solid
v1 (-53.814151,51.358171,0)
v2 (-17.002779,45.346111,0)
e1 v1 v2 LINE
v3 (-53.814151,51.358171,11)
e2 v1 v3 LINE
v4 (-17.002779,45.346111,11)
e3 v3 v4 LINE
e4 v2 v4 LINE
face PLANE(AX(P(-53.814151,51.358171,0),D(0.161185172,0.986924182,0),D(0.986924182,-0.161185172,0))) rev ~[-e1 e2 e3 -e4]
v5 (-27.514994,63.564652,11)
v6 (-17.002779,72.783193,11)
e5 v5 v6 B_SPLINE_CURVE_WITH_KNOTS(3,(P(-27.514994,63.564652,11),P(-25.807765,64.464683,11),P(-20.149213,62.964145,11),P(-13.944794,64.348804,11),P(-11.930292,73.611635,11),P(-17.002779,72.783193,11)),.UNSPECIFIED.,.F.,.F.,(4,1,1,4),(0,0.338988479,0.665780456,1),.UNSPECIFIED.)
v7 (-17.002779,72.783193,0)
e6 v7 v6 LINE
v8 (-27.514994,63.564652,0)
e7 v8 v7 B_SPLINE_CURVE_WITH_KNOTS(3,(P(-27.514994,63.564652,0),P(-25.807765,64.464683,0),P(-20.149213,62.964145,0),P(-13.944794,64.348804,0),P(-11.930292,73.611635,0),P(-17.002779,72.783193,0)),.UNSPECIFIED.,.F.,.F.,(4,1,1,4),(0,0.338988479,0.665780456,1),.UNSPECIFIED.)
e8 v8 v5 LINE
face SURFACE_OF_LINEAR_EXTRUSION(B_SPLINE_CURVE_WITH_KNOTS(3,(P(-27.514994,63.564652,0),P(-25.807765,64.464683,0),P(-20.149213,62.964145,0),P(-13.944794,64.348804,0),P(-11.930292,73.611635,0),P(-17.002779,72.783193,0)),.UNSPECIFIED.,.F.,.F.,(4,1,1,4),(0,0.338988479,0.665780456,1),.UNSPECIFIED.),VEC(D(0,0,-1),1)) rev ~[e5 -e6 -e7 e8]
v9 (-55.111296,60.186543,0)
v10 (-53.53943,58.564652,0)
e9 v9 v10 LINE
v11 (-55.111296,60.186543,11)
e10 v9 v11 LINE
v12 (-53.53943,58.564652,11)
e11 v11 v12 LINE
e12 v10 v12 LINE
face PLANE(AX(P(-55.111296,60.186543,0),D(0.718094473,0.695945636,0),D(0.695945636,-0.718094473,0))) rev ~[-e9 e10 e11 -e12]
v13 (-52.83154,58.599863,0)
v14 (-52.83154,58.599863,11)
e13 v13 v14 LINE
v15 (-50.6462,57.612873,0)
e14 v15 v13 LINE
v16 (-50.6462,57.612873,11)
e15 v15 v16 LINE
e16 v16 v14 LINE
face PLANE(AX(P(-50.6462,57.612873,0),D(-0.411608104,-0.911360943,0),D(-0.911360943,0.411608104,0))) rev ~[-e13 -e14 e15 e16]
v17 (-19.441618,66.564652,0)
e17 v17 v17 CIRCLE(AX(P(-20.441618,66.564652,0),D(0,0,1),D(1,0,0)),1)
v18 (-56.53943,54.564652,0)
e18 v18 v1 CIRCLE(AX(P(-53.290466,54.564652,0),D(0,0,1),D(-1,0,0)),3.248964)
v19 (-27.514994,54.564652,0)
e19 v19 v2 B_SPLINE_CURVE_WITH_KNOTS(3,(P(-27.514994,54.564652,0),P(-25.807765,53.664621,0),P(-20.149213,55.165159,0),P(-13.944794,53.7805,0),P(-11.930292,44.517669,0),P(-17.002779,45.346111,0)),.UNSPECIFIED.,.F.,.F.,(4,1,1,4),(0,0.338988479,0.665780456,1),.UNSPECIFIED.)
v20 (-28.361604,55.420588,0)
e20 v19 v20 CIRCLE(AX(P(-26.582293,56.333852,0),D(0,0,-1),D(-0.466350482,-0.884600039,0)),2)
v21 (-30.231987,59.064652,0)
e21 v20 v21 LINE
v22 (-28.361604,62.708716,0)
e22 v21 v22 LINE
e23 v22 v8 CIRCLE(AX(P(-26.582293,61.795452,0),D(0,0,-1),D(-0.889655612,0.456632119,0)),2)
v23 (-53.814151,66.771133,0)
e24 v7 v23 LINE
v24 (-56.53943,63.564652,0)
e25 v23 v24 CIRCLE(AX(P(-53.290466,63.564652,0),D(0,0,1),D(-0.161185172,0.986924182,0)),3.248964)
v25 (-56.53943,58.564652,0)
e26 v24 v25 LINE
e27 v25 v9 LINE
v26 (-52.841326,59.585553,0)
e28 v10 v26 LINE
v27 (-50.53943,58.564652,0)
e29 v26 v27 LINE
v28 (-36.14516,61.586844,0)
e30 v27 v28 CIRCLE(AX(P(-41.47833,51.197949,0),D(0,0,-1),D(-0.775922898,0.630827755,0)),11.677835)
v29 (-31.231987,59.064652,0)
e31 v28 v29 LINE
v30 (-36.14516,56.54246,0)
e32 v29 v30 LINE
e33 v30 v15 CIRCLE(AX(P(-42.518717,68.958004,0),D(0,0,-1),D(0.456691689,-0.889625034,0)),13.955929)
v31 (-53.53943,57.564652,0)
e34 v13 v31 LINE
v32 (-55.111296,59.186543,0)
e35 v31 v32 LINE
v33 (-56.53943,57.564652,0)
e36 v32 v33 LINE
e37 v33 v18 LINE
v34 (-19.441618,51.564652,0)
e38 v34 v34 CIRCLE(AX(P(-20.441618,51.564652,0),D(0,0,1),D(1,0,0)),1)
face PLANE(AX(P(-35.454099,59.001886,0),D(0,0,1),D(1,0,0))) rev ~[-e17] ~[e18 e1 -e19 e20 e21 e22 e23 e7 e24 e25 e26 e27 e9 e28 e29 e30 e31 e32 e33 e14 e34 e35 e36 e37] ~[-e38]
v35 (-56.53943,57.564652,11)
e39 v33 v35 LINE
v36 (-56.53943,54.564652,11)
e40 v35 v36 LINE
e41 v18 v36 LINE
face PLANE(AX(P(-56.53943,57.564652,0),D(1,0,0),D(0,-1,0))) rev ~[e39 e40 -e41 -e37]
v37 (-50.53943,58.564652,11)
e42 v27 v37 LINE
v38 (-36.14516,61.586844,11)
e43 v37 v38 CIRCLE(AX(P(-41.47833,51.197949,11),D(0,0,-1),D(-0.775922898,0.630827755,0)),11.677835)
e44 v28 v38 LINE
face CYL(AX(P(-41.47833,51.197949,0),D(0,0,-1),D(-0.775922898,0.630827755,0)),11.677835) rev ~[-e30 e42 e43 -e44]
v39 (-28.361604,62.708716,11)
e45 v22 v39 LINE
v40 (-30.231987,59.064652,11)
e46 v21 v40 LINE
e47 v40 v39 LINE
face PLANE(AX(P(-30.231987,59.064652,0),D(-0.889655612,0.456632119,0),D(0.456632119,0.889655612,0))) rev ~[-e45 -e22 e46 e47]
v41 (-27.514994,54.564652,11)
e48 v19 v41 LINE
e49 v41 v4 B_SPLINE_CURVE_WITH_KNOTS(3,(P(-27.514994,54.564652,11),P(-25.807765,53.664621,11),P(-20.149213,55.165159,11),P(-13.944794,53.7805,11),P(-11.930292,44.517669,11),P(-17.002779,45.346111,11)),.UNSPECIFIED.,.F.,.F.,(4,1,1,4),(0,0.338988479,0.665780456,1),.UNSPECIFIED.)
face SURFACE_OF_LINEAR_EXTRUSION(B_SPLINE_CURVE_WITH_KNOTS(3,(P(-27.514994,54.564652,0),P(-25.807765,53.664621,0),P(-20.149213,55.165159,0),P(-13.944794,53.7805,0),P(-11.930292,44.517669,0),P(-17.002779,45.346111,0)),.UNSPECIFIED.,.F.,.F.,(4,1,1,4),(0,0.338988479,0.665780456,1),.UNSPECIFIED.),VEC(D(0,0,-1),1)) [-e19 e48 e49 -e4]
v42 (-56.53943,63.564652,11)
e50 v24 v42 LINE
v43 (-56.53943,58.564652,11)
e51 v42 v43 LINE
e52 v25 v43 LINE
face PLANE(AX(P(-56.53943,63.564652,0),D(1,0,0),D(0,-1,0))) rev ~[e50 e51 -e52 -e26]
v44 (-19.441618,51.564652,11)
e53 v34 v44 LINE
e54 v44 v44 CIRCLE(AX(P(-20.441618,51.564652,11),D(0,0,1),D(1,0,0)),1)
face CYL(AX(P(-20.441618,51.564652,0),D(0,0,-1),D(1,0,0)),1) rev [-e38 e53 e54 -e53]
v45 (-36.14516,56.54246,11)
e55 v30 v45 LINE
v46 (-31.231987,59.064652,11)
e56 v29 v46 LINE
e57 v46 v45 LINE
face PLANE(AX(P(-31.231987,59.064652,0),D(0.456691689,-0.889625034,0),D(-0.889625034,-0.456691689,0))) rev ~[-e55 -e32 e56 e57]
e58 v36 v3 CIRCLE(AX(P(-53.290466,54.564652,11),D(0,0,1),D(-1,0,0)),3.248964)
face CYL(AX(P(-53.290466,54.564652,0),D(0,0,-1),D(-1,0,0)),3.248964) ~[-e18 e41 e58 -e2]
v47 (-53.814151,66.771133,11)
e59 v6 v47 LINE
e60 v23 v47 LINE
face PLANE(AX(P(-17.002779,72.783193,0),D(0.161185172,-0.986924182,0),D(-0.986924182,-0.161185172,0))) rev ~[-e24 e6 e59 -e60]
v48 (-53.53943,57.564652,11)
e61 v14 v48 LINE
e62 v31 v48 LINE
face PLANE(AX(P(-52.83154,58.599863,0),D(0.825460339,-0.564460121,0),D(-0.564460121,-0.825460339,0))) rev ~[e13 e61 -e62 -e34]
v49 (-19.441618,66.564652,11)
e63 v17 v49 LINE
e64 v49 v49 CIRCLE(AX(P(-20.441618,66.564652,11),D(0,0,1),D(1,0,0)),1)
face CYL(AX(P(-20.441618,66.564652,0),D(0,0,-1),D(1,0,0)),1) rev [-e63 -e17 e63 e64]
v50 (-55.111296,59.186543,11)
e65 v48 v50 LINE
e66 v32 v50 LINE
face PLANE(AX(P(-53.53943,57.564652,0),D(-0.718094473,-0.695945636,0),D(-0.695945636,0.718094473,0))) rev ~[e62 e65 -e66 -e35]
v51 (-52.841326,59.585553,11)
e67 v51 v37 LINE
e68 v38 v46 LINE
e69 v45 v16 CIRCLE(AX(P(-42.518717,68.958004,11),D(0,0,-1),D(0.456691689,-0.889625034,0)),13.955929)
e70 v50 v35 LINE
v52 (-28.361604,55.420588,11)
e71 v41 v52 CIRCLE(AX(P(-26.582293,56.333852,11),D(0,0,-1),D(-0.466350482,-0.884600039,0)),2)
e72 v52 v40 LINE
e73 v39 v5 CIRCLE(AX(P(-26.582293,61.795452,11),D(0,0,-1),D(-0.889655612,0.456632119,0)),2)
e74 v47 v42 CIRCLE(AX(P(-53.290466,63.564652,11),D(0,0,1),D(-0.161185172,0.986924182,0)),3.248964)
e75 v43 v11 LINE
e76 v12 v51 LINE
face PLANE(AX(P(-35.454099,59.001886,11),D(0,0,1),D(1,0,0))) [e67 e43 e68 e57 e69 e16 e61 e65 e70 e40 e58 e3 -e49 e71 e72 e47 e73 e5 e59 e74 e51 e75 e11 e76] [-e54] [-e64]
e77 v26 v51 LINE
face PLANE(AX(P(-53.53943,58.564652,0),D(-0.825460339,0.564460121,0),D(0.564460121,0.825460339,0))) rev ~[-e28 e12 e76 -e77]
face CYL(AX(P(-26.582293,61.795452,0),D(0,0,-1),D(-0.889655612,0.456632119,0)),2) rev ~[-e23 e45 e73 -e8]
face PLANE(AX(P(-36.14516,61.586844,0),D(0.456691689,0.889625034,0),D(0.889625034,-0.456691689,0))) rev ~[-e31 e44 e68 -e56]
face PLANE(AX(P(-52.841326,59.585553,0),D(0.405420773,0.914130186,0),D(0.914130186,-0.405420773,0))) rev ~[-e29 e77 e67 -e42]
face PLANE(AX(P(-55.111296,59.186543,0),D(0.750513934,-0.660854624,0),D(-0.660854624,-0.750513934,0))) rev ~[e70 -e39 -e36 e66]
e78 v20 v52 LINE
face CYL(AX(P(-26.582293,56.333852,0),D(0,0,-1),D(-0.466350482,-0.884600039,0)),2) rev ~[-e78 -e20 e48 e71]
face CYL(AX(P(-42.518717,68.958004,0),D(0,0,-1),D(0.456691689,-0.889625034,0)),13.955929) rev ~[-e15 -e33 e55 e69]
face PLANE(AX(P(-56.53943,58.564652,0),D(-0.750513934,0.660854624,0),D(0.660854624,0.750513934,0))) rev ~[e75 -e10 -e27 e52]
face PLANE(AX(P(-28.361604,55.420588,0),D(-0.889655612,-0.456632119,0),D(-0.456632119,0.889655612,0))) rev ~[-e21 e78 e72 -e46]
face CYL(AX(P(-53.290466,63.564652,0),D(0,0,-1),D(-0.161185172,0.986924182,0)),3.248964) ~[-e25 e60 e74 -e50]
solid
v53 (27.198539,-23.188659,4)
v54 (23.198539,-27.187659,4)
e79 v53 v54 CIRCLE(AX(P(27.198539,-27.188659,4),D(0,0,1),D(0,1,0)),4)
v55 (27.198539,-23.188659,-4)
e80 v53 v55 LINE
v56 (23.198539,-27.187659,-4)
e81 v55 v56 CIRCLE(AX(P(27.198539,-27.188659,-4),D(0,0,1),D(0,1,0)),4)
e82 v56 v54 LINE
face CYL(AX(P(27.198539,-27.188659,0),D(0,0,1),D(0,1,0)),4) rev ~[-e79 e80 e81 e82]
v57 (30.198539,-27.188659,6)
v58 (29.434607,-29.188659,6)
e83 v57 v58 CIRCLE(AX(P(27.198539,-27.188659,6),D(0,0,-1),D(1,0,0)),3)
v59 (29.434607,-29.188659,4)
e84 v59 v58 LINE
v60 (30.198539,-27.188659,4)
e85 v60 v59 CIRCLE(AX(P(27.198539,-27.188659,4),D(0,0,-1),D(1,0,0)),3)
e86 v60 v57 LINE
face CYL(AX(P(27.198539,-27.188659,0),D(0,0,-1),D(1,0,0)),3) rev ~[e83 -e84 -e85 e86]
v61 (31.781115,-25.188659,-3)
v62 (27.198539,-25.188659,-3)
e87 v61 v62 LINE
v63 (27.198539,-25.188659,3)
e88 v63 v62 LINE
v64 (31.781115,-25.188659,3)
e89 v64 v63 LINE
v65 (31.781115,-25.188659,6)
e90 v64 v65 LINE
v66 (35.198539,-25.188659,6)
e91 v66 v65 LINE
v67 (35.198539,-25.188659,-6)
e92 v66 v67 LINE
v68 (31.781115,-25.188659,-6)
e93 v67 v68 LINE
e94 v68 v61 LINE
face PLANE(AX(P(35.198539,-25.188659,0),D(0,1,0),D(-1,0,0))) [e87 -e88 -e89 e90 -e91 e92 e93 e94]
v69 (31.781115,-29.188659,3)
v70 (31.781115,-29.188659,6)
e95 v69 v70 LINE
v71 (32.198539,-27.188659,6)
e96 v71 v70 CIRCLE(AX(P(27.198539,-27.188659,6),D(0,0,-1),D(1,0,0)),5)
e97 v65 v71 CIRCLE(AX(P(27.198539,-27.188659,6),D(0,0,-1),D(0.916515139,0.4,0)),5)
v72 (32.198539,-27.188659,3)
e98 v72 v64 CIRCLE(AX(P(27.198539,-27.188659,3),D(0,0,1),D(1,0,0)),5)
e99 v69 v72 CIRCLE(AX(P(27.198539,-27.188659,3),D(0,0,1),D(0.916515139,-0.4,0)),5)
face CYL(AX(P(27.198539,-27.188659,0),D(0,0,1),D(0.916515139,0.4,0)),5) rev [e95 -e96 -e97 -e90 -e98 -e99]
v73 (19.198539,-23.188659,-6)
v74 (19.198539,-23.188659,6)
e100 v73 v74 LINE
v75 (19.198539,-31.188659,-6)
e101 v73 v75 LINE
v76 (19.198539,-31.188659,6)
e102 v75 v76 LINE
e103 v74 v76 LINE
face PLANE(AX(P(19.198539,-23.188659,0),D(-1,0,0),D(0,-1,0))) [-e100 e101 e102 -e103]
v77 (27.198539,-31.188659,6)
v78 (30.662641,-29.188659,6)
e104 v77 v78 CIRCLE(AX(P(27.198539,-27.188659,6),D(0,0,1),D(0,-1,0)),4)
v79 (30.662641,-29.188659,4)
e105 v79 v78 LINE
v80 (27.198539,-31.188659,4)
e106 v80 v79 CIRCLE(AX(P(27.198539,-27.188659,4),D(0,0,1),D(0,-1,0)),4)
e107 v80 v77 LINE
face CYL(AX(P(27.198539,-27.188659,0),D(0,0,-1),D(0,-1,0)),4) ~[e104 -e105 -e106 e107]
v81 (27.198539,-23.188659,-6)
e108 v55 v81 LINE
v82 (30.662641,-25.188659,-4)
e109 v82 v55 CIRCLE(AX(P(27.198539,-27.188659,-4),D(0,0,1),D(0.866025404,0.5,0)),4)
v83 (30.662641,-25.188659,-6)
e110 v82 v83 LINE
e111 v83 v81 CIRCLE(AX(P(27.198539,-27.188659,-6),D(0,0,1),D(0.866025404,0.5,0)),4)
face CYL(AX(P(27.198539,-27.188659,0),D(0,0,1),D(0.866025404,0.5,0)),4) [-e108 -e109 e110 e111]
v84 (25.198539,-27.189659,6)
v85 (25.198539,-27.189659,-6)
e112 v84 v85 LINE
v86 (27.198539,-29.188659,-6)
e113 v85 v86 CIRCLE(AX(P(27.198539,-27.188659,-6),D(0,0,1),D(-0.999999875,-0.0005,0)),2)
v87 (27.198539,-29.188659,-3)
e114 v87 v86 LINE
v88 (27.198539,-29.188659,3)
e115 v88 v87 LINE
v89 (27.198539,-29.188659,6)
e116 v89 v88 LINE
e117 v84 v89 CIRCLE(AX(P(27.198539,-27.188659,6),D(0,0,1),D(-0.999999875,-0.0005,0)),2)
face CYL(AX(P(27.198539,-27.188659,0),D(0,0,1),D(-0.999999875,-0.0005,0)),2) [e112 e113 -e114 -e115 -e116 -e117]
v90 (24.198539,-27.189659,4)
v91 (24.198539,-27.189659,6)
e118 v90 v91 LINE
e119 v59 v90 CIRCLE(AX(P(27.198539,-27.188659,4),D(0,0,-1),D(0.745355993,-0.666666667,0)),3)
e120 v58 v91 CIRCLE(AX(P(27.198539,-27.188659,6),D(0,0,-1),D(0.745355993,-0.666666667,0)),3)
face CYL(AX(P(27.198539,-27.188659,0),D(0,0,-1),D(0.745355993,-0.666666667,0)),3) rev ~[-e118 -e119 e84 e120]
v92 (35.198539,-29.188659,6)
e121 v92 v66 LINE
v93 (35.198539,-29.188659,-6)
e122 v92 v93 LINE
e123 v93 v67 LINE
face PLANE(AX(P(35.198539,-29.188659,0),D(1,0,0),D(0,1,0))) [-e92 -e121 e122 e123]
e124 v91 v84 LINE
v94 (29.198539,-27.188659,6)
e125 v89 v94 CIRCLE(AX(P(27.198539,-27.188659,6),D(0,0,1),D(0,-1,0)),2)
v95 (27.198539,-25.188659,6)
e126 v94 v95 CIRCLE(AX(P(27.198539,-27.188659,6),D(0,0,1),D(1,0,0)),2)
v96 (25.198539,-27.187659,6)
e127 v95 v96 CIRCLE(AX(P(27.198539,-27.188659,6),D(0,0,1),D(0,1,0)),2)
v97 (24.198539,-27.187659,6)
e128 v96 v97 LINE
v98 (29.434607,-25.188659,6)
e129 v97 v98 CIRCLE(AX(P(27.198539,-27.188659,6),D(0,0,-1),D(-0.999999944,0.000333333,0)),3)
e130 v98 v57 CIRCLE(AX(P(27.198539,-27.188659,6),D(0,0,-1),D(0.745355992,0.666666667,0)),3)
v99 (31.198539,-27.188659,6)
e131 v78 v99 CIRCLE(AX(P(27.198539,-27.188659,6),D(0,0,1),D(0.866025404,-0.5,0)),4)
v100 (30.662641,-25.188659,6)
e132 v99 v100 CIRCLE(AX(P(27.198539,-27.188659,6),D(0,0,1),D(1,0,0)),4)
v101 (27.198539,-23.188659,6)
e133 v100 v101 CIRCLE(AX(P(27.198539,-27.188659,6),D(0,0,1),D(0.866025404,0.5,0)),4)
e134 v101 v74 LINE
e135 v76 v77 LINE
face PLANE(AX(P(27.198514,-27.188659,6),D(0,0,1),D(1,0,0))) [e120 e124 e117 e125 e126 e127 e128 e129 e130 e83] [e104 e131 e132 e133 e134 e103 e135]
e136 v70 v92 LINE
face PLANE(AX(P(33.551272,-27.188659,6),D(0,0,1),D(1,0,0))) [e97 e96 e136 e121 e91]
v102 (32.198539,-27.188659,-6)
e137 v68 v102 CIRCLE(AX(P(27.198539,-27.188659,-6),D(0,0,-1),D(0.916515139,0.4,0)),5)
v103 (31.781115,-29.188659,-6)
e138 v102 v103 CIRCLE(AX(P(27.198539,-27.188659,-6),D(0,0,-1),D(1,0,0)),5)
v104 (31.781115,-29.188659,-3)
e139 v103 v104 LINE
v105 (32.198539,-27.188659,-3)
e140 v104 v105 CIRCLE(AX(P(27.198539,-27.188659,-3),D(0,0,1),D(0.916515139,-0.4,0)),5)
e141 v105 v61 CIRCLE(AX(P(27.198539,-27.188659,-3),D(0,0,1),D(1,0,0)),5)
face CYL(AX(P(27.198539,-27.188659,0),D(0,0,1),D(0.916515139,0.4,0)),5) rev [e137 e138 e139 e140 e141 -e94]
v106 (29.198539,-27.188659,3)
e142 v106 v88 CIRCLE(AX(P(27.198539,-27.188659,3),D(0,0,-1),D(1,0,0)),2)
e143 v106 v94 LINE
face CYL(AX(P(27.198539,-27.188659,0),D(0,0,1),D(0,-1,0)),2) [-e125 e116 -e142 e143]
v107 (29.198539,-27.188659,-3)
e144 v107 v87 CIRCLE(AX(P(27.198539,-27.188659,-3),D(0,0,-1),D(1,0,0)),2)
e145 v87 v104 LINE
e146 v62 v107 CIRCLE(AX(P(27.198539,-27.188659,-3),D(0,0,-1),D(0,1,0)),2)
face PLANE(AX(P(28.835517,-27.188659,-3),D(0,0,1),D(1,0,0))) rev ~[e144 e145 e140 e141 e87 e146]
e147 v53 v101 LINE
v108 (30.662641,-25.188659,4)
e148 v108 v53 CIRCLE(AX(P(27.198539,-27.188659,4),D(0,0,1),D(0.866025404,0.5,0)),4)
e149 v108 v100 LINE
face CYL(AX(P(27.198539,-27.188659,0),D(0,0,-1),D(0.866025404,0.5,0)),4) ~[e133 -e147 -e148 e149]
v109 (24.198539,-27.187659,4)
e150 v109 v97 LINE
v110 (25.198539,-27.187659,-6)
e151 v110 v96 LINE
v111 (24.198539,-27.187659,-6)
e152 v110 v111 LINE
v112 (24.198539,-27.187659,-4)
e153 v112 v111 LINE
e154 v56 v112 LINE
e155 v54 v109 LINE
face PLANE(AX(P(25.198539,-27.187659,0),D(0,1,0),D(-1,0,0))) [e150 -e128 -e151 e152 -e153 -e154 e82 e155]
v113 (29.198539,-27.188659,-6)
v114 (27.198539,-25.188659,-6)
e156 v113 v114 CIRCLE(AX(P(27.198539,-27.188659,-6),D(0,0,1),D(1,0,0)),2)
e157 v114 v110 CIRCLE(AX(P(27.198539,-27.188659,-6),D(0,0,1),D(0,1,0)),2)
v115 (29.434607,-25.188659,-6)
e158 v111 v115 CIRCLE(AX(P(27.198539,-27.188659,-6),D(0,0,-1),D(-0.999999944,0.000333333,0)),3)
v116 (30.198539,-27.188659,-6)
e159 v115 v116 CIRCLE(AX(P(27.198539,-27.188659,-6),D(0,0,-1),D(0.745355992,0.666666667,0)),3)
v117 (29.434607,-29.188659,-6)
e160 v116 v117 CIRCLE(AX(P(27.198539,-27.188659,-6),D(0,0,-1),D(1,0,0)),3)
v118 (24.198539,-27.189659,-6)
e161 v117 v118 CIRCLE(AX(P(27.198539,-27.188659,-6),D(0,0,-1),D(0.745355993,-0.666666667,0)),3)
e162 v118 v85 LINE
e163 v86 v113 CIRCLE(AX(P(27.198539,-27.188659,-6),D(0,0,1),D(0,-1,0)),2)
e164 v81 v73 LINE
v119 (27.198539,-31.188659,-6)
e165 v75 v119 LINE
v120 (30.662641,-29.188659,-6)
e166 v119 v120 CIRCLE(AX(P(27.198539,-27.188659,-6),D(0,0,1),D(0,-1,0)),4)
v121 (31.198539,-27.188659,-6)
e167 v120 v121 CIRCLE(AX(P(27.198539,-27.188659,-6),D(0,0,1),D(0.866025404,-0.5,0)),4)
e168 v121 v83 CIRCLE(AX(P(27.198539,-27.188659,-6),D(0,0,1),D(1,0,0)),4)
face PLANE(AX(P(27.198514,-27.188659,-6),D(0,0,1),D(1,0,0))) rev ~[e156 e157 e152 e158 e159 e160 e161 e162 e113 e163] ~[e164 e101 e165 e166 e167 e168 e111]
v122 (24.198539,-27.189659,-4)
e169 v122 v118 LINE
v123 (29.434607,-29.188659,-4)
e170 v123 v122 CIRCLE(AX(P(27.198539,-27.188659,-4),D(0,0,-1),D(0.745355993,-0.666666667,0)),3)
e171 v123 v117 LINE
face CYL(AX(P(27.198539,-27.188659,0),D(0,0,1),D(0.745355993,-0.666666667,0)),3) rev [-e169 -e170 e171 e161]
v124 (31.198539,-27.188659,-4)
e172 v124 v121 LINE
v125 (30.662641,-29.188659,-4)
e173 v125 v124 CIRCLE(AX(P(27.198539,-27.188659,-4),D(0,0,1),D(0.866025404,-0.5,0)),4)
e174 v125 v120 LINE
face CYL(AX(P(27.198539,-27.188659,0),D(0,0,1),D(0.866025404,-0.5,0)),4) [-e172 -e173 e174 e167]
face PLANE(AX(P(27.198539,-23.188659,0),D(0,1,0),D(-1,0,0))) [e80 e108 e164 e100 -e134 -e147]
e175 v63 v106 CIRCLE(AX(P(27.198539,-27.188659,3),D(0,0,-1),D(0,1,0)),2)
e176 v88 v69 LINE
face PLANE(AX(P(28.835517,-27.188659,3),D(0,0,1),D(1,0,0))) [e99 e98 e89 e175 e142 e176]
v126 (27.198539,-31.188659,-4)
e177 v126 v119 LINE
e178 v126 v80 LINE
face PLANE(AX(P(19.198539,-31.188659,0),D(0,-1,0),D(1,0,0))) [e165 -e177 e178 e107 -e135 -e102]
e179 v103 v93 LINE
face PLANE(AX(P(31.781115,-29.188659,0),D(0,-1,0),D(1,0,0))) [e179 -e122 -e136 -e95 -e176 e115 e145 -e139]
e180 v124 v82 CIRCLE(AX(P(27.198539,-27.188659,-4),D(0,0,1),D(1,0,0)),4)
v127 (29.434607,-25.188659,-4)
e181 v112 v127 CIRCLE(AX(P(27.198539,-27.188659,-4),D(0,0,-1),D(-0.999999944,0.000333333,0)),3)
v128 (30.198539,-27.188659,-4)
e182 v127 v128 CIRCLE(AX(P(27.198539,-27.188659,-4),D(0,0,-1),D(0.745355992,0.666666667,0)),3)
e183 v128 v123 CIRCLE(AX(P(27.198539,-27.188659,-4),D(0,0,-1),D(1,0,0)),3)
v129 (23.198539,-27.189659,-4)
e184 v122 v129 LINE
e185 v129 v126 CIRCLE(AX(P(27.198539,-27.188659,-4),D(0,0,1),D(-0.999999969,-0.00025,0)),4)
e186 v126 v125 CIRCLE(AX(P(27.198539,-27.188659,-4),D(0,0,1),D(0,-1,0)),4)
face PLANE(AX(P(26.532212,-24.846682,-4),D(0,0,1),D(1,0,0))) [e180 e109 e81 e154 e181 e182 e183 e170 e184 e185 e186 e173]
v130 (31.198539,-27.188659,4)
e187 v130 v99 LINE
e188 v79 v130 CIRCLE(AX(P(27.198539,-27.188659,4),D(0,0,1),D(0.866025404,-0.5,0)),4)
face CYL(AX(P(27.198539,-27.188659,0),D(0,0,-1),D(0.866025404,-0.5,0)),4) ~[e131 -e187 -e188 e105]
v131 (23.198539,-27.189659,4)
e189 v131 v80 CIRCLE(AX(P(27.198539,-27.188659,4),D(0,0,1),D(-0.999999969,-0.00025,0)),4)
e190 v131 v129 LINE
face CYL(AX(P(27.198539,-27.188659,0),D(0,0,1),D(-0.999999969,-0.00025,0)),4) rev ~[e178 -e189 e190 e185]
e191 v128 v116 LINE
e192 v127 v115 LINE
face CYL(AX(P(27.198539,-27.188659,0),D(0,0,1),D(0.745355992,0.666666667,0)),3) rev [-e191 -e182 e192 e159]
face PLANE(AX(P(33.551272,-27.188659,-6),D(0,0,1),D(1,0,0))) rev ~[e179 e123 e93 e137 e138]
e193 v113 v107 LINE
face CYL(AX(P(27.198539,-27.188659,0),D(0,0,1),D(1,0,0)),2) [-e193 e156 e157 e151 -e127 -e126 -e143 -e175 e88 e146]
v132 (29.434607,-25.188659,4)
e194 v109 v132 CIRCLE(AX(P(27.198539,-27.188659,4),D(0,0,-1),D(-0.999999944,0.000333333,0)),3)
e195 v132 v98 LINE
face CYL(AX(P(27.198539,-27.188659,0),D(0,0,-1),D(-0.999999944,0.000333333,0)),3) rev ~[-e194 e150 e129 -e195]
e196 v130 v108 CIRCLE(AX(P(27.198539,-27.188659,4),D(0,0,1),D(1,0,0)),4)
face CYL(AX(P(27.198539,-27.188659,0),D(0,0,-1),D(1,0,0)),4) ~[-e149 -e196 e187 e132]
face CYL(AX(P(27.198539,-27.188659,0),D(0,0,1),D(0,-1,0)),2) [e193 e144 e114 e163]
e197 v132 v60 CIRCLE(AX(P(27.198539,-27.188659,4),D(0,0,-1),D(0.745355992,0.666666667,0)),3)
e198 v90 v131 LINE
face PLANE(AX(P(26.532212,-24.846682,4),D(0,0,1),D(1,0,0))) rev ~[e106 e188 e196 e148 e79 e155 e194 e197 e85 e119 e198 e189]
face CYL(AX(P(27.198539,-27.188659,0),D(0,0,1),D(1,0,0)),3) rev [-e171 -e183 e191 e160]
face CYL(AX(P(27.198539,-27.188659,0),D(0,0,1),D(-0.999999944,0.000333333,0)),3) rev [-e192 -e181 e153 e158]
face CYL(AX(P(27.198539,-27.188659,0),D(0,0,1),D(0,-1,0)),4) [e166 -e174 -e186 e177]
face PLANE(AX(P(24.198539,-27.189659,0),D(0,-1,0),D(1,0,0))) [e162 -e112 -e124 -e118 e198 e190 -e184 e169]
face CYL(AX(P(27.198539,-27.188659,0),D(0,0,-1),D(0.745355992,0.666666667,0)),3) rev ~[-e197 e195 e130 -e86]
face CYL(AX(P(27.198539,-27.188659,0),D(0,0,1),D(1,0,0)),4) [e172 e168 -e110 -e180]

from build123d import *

# Parameters (mm, degrees)
F0_R     = 1
F1_DEPTH = 11
F3_DEPTH = 6
F4_DEPTH = 4
F5_DEPTH = 3
F6_DEPTH = 6


# Not quite as in the source:
# - a feature names something its author has since deleted; it is built from what else it names


with BuildPart() as f1:
    # F0 (on Top) → F1 (new body)
    with BuildSketch(Plane.XY):
        with BuildLine():
            Line((-56.5394303022, 63.5646519078), (-56.5394303022, 60.5646519078))
            Line((-56.5394303022, 60.5646519078), (-56.5394303022, 58.5646519078))
            Line((-56.5394303022, 58.5646519078), (-55.1112962965, 60.1865433678))
            Line((-55.1112962965, 60.1865433678), (-53.5394303022, 58.5646519078))
            Line((-53.5394303022, 58.5646519078), (-52.8413255975, 59.585552632))
            Line((-52.8413255975, 59.585552632), (-50.5394303022, 58.5646519078))
            ThreePointArc((-50.5394303022, 58.5646519078), (-43.8778670045, 62.6266002152), (-36.1451600741, 61.5868439218))
            Line((-36.1451600741, 61.5868439218), (-31.2319873402, 59.0646519078))
            Line((-31.2319873402, 59.0646519078), (-36.1451600741, 56.5424598938))
            ThreePointArc((-36.1451600741, 56.5424598938), (-43.5460973086, 55.0399418647), (-50.6461998164, 57.612873414))
            Line((-50.6461998164, 57.612873414), (-52.831540008, 58.5998629716))
            Line((-52.831540008, 58.5998629716), (-53.5394303022, 57.5646519078))
            Line((-53.5394303022, 57.5646519078), (-55.1112962965, 59.1865433678))
            Line((-55.1112962965, 59.1865433678), (-56.5394303022, 57.5646519078))
            Line((-56.5394303022, 57.5646519078), (-56.5394303022, 54.5646519078))
            ThreePointArc((-56.5394303022, 54.5646519078), (-55.7660672354, 52.4605684374), (-53.8141510367, 51.3581706702))
            Line((-53.8141510367, 51.3581706702), (-17.0027786636, 45.3461106944))
            add(Edge.make_bspline(
                [(-27.5149940739, 54.5646519078), (-25.8077646027, 53.6646211006), (-20.1492133777, 55.1651591419), (-13.9447941806, 53.7805000119), (-11.9302922568, 44.5176685435), (-17.0027786636, 45.3461106944)],
                knots=[0, 0, 0, 0, 0.3389884786, 0.6657804562, 1, 1, 1, 1], degree=3))
            ThreePointArc((-27.5149940739, 54.5646519078), (-28.0042315995, 54.9274057779), (-28.3616043344, 55.4205877474))
            Line((-28.3616043344, 55.4205877474), (-30.2319873402, 59.0646519078))
            Line((-30.2319873402, 59.0646519078), (-28.3616043344, 62.7087160682))
            ThreePointArc((-28.3616043344, 62.7087160682), (-28.0042315995, 63.2018980376), (-27.5149940739, 63.5646519078))
            add(Edge.make_bspline(
                [(-27.5149940739, 63.5646519078), (-25.8077646027, 64.464682715), (-20.1492133777, 62.9641446737), (-13.9447941806, 64.3488038037), (-11.9302922568, 73.6116352721), (-17.0027786636, 72.7831931212)],
                knots=[0, 0, 0, 0, 0.3389884786, 0.6657804562, 1, 1, 1, 1], degree=3))
            Line((-17.0027786636, 72.7831931212), (-53.8141510367, 66.7711331454))
            ThreePointArc((-53.8141510367, 66.7711331454), (-55.7660672354, 65.6687353782), (-56.5394303022, 63.5646519078))
        make_face()
        with Locations((-20.4416182045, 51.5646519078)):
            Circle(F0_R, mode=Mode.SUBTRACT)
        with Locations((-20.4416182045, 66.5646519078)):
            Circle(F0_R, mode=Mode.SUBTRACT)
    extrude(amount=F1_DEPTH)


with BuildPart() as f3:
    # F2 (on Top) → F3 (new body, symmetric)
    with BuildSketch(Plane.XY):
        with BuildLine():
            ThreePointArc((27.1985391751, -29.1886593086), (28.6127527375, -28.602872871), (29.1985391751, -27.1886593086))
            ThreePointArc((29.1985391751, -27.1886593086), (28.6127527375, -25.7744457462), (27.1985391751, -25.1886593086))
            ThreePointArc((27.1985391751, -25.1886593086), (25.7846792103, -25.774092237), (25.1985394251, -27.1876593086))
            ThreePointArc((25.1985394251, -27.1876593086), (25.1985391751, -27.1886593086), (25.1985394251, -27.1896593086))
            ThreePointArc((25.1985394251, -27.1896593086), (25.7846792103, -28.6032263802), (27.1985391751, -29.1886593086))
        make_face()
        with BuildLine():
            ThreePointArc((25.1985394251, -27.1896593086), (25.1985391751, -27.1886593086), (25.1985394251, -27.1876593086))
            Line((25.1985394251, -27.1876593086), (24.1985393418, -27.1876593086))
            ThreePointArc((24.1985393418, -27.1876593086), (24.1985391751, -27.1886593086), (24.1985393418, -27.1896593086))
            Line((24.1985393418, -27.1896593086), (25.1985394251, -27.1896593086))
        make_face()
        with BuildLine():
            Line((30.6626407902, -25.1886593086), (29.4346071526, -25.1886593086))
            ThreePointArc((29.4346071526, -25.1886593086), (30.001056252, -26.1181930393), (30.1985391751, -27.1886593086))
            ThreePointArc((30.1985391751, -27.1886593086), (30.001056252, -28.2591255779), (29.4346071526, -29.1886593086))
            Line((29.4346071526, -29.1886593086), (30.6626407902, -29.1886593086))
            ThreePointArc((30.6626407902, -29.1886593086), (31.0622424802, -28.223935489), (31.1985391751, -27.1886593086))
            ThreePointArc((31.1985391751, -27.1886593086), (31.0622424802, -26.1533831282), (30.6626407902, -25.1886593086))
        make_face()
        with BuildLine():
            ThreePointArc((24.1985393418, -27.1876593086), (26.1285400068, -24.3859638596), (29.4346071526, -25.1886593086))
            Line((29.4346071526, -25.1886593086), (30.6626407902, -25.1886593086))
            ThreePointArc((30.6626407902, -25.1886593086), (29.1985391751, -23.7245576935), (27.1985391751, -23.1886593086))
            ThreePointArc((27.1985391751, -23.1886593086), (24.3704656258, -24.3598786525), (23.1985393001, -27.1876593086))
            Line((23.1985393001, -27.1876593086), (24.1985393418, -27.1876593086))
        make_face()
        with BuildLine():
            Line((30.6626407902, -29.1886593086), (29.4346071526, -29.1886593086))
            ThreePointArc((29.4346071526, -29.1886593086), (26.1285400068, -29.9913547576), (24.1985393418, -27.1896593086))
            Line((24.1985393418, -27.1896593086), (23.1985393001, -27.1896593086))
            ThreePointArc((23.1985393001, -27.1896593086), (24.3704656258, -30.0174399646), (27.1985391751, -31.1886593086))
            ThreePointArc((27.1985391751, -31.1886593086), (29.1985391751, -30.6527609237), (30.6626407902, -29.1886593086))
        make_face()
        with BuildLine():
            ThreePointArc((24.1985393418, -27.1896593086), (24.1985391751, -27.1886593086), (24.1985393418, -27.1876593086))
            Line((24.1985393418, -27.1876593086), (23.1985393001, -27.1876593086))
            ThreePointArc((23.1985393001, -27.1876593086), (23.1985391751, -27.1886593086), (23.1985393001, -27.1896593086))
            Line((23.1985393001, -27.1896593086), (24.1985393418, -27.1896593086))
        make_face()
        with BuildLine():
            ThreePointArc((23.1985393001, -27.1896593086), (23.1985391751, -27.1886593086), (23.1985393001, -27.1876593086))
            ThreePointArc((23.1985393001, -27.1876593086), (24.3704656258, -24.3598786525), (27.1985391751, -23.1886593086))
            Line((27.1985391751, -23.1886593086), (24.1985391751, -23.1886593086))
            ThreePointArc((24.1985391751, -23.1886593086), (22.1985391751, -27.1886593086), (24.1985391751, -31.1886593086))
            Line((24.1985391751, -31.1886593086), (27.1985391751, -31.1886593086))
            ThreePointArc((27.1985391751, -31.1886593086), (24.3704656258, -30.0174399646), (23.1985393001, -27.1896593086))
        make_face()
        with BuildLine():
            ThreePointArc((24.1985391751, -31.1886593086), (22.1985391751, -27.1886593086), (24.1985391751, -23.1886593086))
            Line((24.1985391751, -23.1886593086), (19.1985391751, -23.1886593086))
            Line((19.1985391751, -23.1886593086), (19.1985391751, -31.1886593086))
            Line((19.1985391751, -31.1886593086), (24.1985391751, -31.1886593086))
        make_face()
    extrude(amount=F3_DEPTH, both=True)

    # F2 (on Top) → F4 (cut, symmetric)
    with BuildSketch(Plane.XY):
        with BuildLine():
            ThreePointArc((24.1985393418, -27.1876593086), (26.1285400068, -24.3859638596), (29.4346071526, -25.1886593086))
            Line((29.4346071526, -25.1886593086), (30.6626407902, -25.1886593086))
            ThreePointArc((30.6626407902, -25.1886593086), (29.1985391751, -23.7245576935), (27.1985391751, -23.1886593086))
            ThreePointArc((27.1985391751, -23.1886593086), (24.3704656258, -24.3598786525), (23.1985393001, -27.1876593086))
            Line((23.1985393001, -27.1876593086), (24.1985393418, -27.1876593086))
        make_face()
        with BuildLine():
            Line((30.6626407902, -25.1886593086), (29.4346071526, -25.1886593086))
            ThreePointArc((29.4346071526, -25.1886593086), (30.001056252, -26.1181930393), (30.1985391751, -27.1886593086))
            ThreePointArc((30.1985391751, -27.1886593086), (30.001056252, -28.2591255779), (29.4346071526, -29.1886593086))
            Line((29.4346071526, -29.1886593086), (30.6626407902, -29.1886593086))
            ThreePointArc((30.6626407902, -29.1886593086), (31.0622424802, -28.223935489), (31.1985391751, -27.1886593086))
            ThreePointArc((31.1985391751, -27.1886593086), (31.0622424802, -26.1533831282), (30.6626407902, -25.1886593086))
        make_face()
        with BuildLine():
            Line((30.6626407902, -29.1886593086), (29.4346071526, -29.1886593086))
            ThreePointArc((29.4346071526, -29.1886593086), (26.1285400068, -29.9913547576), (24.1985393418, -27.1896593086))
            Line((24.1985393418, -27.1896593086), (23.1985393001, -27.1896593086))
            ThreePointArc((23.1985393001, -27.1896593086), (24.3704656258, -30.0174399646), (27.1985391751, -31.1886593086))
            ThreePointArc((27.1985391751, -31.1886593086), (29.1985391751, -30.6527609237), (30.6626407902, -29.1886593086))
        make_face()
    extrude(amount=F4_DEPTH, both=True, mode=Mode.SUBTRACT)

    # F2 (on Top) → F5 (join, symmetric)
    with BuildSketch(Plane.XY):
        with BuildLine():
            ThreePointArc((27.1985391751, -25.1886593086), (28.6127527375, -25.7744457462), (29.1985391751, -27.1886593086))
            ThreePointArc((29.1985391751, -27.1886593086), (28.6127527375, -28.602872871), (27.1985391751, -29.1886593086))
            Line((27.1985391751, -29.1886593086), (29.4346071526, -29.1886593086))
            ThreePointArc((29.4346071526, -29.1886593086), (30.001056252, -28.2591255779), (30.1985391751, -27.1886593086))
            ThreePointArc((30.1985391751, -27.1886593086), (30.001056252, -26.1181930393), (29.4346071526, -25.1886593086))
            Line((29.4346071526, -25.1886593086), (27.1985391751, -25.1886593086))
        make_face()
        with BuildLine():
            Line((31.78111487, -25.1886593086), (30.6626407902, -25.1886593086))
            ThreePointArc((30.6626407902, -25.1886593086), (31.0622424802, -26.1533831282), (31.1985391751, -27.1886593086))
            ThreePointArc((31.1985391751, -27.1886593086), (31.0622424802, -28.223935489), (30.6626407902, -29.1886593086))
            Line((30.6626407902, -29.1886593086), (31.78111487, -29.1886593086))
            ThreePointArc((31.78111487, -29.1886593086), (32.0930707397, -28.210207527), (32.1985391751, -27.1886593086))
            ThreePointArc((32.1985391751, -27.1886593086), (32.0930707397, -26.1671110901), (31.78111487, -25.1886593086))
        make_face()
        with BuildLine():
            Line((30.6626407902, -25.1886593086), (29.4346071526, -25.1886593086))
            ThreePointArc((29.4346071526, -25.1886593086), (30.001056252, -26.1181930393), (30.1985391751, -27.1886593086))
            ThreePointArc((30.1985391751, -27.1886593086), (30.001056252, -28.2591255779), (29.4346071526, -29.1886593086))
            Line((29.4346071526, -29.1886593086), (30.6626407902, -29.1886593086))
            ThreePointArc((30.6626407902, -29.1886593086), (31.0622424802, -28.223935489), (31.1985391751, -27.1886593086))
            ThreePointArc((31.1985391751, -27.1886593086), (31.0622424802, -26.1533831282), (30.6626407902, -25.1886593086))
        make_face()
    extrude(amount=F5_DEPTH, both=True)

    # F2 (on Top) → F6 (join, symmetric)
    with BuildSketch(Plane.XY):
        with BuildLine():
            Line((35.1985391751, -25.1886593086), (31.78111487, -25.1886593086))
            ThreePointArc((31.78111487, -25.1886593086), (32.0930707397, -26.1671110901), (32.1985391751, -27.1886593086))
            ThreePointArc((32.1985391751, -27.1886593086), (32.0930707397, -28.210207527), (31.78111487, -29.1886593086))
            Line((31.78111487, -29.1886593086), (35.1985391751, -29.1886593086))
            Line((35.1985391751, -29.1886593086), (35.1985391751, -25.1886593086))
        make_face()
    extrude(amount=F6_DEPTH, both=True)


solid = Compound([f1.part, f3.part])
